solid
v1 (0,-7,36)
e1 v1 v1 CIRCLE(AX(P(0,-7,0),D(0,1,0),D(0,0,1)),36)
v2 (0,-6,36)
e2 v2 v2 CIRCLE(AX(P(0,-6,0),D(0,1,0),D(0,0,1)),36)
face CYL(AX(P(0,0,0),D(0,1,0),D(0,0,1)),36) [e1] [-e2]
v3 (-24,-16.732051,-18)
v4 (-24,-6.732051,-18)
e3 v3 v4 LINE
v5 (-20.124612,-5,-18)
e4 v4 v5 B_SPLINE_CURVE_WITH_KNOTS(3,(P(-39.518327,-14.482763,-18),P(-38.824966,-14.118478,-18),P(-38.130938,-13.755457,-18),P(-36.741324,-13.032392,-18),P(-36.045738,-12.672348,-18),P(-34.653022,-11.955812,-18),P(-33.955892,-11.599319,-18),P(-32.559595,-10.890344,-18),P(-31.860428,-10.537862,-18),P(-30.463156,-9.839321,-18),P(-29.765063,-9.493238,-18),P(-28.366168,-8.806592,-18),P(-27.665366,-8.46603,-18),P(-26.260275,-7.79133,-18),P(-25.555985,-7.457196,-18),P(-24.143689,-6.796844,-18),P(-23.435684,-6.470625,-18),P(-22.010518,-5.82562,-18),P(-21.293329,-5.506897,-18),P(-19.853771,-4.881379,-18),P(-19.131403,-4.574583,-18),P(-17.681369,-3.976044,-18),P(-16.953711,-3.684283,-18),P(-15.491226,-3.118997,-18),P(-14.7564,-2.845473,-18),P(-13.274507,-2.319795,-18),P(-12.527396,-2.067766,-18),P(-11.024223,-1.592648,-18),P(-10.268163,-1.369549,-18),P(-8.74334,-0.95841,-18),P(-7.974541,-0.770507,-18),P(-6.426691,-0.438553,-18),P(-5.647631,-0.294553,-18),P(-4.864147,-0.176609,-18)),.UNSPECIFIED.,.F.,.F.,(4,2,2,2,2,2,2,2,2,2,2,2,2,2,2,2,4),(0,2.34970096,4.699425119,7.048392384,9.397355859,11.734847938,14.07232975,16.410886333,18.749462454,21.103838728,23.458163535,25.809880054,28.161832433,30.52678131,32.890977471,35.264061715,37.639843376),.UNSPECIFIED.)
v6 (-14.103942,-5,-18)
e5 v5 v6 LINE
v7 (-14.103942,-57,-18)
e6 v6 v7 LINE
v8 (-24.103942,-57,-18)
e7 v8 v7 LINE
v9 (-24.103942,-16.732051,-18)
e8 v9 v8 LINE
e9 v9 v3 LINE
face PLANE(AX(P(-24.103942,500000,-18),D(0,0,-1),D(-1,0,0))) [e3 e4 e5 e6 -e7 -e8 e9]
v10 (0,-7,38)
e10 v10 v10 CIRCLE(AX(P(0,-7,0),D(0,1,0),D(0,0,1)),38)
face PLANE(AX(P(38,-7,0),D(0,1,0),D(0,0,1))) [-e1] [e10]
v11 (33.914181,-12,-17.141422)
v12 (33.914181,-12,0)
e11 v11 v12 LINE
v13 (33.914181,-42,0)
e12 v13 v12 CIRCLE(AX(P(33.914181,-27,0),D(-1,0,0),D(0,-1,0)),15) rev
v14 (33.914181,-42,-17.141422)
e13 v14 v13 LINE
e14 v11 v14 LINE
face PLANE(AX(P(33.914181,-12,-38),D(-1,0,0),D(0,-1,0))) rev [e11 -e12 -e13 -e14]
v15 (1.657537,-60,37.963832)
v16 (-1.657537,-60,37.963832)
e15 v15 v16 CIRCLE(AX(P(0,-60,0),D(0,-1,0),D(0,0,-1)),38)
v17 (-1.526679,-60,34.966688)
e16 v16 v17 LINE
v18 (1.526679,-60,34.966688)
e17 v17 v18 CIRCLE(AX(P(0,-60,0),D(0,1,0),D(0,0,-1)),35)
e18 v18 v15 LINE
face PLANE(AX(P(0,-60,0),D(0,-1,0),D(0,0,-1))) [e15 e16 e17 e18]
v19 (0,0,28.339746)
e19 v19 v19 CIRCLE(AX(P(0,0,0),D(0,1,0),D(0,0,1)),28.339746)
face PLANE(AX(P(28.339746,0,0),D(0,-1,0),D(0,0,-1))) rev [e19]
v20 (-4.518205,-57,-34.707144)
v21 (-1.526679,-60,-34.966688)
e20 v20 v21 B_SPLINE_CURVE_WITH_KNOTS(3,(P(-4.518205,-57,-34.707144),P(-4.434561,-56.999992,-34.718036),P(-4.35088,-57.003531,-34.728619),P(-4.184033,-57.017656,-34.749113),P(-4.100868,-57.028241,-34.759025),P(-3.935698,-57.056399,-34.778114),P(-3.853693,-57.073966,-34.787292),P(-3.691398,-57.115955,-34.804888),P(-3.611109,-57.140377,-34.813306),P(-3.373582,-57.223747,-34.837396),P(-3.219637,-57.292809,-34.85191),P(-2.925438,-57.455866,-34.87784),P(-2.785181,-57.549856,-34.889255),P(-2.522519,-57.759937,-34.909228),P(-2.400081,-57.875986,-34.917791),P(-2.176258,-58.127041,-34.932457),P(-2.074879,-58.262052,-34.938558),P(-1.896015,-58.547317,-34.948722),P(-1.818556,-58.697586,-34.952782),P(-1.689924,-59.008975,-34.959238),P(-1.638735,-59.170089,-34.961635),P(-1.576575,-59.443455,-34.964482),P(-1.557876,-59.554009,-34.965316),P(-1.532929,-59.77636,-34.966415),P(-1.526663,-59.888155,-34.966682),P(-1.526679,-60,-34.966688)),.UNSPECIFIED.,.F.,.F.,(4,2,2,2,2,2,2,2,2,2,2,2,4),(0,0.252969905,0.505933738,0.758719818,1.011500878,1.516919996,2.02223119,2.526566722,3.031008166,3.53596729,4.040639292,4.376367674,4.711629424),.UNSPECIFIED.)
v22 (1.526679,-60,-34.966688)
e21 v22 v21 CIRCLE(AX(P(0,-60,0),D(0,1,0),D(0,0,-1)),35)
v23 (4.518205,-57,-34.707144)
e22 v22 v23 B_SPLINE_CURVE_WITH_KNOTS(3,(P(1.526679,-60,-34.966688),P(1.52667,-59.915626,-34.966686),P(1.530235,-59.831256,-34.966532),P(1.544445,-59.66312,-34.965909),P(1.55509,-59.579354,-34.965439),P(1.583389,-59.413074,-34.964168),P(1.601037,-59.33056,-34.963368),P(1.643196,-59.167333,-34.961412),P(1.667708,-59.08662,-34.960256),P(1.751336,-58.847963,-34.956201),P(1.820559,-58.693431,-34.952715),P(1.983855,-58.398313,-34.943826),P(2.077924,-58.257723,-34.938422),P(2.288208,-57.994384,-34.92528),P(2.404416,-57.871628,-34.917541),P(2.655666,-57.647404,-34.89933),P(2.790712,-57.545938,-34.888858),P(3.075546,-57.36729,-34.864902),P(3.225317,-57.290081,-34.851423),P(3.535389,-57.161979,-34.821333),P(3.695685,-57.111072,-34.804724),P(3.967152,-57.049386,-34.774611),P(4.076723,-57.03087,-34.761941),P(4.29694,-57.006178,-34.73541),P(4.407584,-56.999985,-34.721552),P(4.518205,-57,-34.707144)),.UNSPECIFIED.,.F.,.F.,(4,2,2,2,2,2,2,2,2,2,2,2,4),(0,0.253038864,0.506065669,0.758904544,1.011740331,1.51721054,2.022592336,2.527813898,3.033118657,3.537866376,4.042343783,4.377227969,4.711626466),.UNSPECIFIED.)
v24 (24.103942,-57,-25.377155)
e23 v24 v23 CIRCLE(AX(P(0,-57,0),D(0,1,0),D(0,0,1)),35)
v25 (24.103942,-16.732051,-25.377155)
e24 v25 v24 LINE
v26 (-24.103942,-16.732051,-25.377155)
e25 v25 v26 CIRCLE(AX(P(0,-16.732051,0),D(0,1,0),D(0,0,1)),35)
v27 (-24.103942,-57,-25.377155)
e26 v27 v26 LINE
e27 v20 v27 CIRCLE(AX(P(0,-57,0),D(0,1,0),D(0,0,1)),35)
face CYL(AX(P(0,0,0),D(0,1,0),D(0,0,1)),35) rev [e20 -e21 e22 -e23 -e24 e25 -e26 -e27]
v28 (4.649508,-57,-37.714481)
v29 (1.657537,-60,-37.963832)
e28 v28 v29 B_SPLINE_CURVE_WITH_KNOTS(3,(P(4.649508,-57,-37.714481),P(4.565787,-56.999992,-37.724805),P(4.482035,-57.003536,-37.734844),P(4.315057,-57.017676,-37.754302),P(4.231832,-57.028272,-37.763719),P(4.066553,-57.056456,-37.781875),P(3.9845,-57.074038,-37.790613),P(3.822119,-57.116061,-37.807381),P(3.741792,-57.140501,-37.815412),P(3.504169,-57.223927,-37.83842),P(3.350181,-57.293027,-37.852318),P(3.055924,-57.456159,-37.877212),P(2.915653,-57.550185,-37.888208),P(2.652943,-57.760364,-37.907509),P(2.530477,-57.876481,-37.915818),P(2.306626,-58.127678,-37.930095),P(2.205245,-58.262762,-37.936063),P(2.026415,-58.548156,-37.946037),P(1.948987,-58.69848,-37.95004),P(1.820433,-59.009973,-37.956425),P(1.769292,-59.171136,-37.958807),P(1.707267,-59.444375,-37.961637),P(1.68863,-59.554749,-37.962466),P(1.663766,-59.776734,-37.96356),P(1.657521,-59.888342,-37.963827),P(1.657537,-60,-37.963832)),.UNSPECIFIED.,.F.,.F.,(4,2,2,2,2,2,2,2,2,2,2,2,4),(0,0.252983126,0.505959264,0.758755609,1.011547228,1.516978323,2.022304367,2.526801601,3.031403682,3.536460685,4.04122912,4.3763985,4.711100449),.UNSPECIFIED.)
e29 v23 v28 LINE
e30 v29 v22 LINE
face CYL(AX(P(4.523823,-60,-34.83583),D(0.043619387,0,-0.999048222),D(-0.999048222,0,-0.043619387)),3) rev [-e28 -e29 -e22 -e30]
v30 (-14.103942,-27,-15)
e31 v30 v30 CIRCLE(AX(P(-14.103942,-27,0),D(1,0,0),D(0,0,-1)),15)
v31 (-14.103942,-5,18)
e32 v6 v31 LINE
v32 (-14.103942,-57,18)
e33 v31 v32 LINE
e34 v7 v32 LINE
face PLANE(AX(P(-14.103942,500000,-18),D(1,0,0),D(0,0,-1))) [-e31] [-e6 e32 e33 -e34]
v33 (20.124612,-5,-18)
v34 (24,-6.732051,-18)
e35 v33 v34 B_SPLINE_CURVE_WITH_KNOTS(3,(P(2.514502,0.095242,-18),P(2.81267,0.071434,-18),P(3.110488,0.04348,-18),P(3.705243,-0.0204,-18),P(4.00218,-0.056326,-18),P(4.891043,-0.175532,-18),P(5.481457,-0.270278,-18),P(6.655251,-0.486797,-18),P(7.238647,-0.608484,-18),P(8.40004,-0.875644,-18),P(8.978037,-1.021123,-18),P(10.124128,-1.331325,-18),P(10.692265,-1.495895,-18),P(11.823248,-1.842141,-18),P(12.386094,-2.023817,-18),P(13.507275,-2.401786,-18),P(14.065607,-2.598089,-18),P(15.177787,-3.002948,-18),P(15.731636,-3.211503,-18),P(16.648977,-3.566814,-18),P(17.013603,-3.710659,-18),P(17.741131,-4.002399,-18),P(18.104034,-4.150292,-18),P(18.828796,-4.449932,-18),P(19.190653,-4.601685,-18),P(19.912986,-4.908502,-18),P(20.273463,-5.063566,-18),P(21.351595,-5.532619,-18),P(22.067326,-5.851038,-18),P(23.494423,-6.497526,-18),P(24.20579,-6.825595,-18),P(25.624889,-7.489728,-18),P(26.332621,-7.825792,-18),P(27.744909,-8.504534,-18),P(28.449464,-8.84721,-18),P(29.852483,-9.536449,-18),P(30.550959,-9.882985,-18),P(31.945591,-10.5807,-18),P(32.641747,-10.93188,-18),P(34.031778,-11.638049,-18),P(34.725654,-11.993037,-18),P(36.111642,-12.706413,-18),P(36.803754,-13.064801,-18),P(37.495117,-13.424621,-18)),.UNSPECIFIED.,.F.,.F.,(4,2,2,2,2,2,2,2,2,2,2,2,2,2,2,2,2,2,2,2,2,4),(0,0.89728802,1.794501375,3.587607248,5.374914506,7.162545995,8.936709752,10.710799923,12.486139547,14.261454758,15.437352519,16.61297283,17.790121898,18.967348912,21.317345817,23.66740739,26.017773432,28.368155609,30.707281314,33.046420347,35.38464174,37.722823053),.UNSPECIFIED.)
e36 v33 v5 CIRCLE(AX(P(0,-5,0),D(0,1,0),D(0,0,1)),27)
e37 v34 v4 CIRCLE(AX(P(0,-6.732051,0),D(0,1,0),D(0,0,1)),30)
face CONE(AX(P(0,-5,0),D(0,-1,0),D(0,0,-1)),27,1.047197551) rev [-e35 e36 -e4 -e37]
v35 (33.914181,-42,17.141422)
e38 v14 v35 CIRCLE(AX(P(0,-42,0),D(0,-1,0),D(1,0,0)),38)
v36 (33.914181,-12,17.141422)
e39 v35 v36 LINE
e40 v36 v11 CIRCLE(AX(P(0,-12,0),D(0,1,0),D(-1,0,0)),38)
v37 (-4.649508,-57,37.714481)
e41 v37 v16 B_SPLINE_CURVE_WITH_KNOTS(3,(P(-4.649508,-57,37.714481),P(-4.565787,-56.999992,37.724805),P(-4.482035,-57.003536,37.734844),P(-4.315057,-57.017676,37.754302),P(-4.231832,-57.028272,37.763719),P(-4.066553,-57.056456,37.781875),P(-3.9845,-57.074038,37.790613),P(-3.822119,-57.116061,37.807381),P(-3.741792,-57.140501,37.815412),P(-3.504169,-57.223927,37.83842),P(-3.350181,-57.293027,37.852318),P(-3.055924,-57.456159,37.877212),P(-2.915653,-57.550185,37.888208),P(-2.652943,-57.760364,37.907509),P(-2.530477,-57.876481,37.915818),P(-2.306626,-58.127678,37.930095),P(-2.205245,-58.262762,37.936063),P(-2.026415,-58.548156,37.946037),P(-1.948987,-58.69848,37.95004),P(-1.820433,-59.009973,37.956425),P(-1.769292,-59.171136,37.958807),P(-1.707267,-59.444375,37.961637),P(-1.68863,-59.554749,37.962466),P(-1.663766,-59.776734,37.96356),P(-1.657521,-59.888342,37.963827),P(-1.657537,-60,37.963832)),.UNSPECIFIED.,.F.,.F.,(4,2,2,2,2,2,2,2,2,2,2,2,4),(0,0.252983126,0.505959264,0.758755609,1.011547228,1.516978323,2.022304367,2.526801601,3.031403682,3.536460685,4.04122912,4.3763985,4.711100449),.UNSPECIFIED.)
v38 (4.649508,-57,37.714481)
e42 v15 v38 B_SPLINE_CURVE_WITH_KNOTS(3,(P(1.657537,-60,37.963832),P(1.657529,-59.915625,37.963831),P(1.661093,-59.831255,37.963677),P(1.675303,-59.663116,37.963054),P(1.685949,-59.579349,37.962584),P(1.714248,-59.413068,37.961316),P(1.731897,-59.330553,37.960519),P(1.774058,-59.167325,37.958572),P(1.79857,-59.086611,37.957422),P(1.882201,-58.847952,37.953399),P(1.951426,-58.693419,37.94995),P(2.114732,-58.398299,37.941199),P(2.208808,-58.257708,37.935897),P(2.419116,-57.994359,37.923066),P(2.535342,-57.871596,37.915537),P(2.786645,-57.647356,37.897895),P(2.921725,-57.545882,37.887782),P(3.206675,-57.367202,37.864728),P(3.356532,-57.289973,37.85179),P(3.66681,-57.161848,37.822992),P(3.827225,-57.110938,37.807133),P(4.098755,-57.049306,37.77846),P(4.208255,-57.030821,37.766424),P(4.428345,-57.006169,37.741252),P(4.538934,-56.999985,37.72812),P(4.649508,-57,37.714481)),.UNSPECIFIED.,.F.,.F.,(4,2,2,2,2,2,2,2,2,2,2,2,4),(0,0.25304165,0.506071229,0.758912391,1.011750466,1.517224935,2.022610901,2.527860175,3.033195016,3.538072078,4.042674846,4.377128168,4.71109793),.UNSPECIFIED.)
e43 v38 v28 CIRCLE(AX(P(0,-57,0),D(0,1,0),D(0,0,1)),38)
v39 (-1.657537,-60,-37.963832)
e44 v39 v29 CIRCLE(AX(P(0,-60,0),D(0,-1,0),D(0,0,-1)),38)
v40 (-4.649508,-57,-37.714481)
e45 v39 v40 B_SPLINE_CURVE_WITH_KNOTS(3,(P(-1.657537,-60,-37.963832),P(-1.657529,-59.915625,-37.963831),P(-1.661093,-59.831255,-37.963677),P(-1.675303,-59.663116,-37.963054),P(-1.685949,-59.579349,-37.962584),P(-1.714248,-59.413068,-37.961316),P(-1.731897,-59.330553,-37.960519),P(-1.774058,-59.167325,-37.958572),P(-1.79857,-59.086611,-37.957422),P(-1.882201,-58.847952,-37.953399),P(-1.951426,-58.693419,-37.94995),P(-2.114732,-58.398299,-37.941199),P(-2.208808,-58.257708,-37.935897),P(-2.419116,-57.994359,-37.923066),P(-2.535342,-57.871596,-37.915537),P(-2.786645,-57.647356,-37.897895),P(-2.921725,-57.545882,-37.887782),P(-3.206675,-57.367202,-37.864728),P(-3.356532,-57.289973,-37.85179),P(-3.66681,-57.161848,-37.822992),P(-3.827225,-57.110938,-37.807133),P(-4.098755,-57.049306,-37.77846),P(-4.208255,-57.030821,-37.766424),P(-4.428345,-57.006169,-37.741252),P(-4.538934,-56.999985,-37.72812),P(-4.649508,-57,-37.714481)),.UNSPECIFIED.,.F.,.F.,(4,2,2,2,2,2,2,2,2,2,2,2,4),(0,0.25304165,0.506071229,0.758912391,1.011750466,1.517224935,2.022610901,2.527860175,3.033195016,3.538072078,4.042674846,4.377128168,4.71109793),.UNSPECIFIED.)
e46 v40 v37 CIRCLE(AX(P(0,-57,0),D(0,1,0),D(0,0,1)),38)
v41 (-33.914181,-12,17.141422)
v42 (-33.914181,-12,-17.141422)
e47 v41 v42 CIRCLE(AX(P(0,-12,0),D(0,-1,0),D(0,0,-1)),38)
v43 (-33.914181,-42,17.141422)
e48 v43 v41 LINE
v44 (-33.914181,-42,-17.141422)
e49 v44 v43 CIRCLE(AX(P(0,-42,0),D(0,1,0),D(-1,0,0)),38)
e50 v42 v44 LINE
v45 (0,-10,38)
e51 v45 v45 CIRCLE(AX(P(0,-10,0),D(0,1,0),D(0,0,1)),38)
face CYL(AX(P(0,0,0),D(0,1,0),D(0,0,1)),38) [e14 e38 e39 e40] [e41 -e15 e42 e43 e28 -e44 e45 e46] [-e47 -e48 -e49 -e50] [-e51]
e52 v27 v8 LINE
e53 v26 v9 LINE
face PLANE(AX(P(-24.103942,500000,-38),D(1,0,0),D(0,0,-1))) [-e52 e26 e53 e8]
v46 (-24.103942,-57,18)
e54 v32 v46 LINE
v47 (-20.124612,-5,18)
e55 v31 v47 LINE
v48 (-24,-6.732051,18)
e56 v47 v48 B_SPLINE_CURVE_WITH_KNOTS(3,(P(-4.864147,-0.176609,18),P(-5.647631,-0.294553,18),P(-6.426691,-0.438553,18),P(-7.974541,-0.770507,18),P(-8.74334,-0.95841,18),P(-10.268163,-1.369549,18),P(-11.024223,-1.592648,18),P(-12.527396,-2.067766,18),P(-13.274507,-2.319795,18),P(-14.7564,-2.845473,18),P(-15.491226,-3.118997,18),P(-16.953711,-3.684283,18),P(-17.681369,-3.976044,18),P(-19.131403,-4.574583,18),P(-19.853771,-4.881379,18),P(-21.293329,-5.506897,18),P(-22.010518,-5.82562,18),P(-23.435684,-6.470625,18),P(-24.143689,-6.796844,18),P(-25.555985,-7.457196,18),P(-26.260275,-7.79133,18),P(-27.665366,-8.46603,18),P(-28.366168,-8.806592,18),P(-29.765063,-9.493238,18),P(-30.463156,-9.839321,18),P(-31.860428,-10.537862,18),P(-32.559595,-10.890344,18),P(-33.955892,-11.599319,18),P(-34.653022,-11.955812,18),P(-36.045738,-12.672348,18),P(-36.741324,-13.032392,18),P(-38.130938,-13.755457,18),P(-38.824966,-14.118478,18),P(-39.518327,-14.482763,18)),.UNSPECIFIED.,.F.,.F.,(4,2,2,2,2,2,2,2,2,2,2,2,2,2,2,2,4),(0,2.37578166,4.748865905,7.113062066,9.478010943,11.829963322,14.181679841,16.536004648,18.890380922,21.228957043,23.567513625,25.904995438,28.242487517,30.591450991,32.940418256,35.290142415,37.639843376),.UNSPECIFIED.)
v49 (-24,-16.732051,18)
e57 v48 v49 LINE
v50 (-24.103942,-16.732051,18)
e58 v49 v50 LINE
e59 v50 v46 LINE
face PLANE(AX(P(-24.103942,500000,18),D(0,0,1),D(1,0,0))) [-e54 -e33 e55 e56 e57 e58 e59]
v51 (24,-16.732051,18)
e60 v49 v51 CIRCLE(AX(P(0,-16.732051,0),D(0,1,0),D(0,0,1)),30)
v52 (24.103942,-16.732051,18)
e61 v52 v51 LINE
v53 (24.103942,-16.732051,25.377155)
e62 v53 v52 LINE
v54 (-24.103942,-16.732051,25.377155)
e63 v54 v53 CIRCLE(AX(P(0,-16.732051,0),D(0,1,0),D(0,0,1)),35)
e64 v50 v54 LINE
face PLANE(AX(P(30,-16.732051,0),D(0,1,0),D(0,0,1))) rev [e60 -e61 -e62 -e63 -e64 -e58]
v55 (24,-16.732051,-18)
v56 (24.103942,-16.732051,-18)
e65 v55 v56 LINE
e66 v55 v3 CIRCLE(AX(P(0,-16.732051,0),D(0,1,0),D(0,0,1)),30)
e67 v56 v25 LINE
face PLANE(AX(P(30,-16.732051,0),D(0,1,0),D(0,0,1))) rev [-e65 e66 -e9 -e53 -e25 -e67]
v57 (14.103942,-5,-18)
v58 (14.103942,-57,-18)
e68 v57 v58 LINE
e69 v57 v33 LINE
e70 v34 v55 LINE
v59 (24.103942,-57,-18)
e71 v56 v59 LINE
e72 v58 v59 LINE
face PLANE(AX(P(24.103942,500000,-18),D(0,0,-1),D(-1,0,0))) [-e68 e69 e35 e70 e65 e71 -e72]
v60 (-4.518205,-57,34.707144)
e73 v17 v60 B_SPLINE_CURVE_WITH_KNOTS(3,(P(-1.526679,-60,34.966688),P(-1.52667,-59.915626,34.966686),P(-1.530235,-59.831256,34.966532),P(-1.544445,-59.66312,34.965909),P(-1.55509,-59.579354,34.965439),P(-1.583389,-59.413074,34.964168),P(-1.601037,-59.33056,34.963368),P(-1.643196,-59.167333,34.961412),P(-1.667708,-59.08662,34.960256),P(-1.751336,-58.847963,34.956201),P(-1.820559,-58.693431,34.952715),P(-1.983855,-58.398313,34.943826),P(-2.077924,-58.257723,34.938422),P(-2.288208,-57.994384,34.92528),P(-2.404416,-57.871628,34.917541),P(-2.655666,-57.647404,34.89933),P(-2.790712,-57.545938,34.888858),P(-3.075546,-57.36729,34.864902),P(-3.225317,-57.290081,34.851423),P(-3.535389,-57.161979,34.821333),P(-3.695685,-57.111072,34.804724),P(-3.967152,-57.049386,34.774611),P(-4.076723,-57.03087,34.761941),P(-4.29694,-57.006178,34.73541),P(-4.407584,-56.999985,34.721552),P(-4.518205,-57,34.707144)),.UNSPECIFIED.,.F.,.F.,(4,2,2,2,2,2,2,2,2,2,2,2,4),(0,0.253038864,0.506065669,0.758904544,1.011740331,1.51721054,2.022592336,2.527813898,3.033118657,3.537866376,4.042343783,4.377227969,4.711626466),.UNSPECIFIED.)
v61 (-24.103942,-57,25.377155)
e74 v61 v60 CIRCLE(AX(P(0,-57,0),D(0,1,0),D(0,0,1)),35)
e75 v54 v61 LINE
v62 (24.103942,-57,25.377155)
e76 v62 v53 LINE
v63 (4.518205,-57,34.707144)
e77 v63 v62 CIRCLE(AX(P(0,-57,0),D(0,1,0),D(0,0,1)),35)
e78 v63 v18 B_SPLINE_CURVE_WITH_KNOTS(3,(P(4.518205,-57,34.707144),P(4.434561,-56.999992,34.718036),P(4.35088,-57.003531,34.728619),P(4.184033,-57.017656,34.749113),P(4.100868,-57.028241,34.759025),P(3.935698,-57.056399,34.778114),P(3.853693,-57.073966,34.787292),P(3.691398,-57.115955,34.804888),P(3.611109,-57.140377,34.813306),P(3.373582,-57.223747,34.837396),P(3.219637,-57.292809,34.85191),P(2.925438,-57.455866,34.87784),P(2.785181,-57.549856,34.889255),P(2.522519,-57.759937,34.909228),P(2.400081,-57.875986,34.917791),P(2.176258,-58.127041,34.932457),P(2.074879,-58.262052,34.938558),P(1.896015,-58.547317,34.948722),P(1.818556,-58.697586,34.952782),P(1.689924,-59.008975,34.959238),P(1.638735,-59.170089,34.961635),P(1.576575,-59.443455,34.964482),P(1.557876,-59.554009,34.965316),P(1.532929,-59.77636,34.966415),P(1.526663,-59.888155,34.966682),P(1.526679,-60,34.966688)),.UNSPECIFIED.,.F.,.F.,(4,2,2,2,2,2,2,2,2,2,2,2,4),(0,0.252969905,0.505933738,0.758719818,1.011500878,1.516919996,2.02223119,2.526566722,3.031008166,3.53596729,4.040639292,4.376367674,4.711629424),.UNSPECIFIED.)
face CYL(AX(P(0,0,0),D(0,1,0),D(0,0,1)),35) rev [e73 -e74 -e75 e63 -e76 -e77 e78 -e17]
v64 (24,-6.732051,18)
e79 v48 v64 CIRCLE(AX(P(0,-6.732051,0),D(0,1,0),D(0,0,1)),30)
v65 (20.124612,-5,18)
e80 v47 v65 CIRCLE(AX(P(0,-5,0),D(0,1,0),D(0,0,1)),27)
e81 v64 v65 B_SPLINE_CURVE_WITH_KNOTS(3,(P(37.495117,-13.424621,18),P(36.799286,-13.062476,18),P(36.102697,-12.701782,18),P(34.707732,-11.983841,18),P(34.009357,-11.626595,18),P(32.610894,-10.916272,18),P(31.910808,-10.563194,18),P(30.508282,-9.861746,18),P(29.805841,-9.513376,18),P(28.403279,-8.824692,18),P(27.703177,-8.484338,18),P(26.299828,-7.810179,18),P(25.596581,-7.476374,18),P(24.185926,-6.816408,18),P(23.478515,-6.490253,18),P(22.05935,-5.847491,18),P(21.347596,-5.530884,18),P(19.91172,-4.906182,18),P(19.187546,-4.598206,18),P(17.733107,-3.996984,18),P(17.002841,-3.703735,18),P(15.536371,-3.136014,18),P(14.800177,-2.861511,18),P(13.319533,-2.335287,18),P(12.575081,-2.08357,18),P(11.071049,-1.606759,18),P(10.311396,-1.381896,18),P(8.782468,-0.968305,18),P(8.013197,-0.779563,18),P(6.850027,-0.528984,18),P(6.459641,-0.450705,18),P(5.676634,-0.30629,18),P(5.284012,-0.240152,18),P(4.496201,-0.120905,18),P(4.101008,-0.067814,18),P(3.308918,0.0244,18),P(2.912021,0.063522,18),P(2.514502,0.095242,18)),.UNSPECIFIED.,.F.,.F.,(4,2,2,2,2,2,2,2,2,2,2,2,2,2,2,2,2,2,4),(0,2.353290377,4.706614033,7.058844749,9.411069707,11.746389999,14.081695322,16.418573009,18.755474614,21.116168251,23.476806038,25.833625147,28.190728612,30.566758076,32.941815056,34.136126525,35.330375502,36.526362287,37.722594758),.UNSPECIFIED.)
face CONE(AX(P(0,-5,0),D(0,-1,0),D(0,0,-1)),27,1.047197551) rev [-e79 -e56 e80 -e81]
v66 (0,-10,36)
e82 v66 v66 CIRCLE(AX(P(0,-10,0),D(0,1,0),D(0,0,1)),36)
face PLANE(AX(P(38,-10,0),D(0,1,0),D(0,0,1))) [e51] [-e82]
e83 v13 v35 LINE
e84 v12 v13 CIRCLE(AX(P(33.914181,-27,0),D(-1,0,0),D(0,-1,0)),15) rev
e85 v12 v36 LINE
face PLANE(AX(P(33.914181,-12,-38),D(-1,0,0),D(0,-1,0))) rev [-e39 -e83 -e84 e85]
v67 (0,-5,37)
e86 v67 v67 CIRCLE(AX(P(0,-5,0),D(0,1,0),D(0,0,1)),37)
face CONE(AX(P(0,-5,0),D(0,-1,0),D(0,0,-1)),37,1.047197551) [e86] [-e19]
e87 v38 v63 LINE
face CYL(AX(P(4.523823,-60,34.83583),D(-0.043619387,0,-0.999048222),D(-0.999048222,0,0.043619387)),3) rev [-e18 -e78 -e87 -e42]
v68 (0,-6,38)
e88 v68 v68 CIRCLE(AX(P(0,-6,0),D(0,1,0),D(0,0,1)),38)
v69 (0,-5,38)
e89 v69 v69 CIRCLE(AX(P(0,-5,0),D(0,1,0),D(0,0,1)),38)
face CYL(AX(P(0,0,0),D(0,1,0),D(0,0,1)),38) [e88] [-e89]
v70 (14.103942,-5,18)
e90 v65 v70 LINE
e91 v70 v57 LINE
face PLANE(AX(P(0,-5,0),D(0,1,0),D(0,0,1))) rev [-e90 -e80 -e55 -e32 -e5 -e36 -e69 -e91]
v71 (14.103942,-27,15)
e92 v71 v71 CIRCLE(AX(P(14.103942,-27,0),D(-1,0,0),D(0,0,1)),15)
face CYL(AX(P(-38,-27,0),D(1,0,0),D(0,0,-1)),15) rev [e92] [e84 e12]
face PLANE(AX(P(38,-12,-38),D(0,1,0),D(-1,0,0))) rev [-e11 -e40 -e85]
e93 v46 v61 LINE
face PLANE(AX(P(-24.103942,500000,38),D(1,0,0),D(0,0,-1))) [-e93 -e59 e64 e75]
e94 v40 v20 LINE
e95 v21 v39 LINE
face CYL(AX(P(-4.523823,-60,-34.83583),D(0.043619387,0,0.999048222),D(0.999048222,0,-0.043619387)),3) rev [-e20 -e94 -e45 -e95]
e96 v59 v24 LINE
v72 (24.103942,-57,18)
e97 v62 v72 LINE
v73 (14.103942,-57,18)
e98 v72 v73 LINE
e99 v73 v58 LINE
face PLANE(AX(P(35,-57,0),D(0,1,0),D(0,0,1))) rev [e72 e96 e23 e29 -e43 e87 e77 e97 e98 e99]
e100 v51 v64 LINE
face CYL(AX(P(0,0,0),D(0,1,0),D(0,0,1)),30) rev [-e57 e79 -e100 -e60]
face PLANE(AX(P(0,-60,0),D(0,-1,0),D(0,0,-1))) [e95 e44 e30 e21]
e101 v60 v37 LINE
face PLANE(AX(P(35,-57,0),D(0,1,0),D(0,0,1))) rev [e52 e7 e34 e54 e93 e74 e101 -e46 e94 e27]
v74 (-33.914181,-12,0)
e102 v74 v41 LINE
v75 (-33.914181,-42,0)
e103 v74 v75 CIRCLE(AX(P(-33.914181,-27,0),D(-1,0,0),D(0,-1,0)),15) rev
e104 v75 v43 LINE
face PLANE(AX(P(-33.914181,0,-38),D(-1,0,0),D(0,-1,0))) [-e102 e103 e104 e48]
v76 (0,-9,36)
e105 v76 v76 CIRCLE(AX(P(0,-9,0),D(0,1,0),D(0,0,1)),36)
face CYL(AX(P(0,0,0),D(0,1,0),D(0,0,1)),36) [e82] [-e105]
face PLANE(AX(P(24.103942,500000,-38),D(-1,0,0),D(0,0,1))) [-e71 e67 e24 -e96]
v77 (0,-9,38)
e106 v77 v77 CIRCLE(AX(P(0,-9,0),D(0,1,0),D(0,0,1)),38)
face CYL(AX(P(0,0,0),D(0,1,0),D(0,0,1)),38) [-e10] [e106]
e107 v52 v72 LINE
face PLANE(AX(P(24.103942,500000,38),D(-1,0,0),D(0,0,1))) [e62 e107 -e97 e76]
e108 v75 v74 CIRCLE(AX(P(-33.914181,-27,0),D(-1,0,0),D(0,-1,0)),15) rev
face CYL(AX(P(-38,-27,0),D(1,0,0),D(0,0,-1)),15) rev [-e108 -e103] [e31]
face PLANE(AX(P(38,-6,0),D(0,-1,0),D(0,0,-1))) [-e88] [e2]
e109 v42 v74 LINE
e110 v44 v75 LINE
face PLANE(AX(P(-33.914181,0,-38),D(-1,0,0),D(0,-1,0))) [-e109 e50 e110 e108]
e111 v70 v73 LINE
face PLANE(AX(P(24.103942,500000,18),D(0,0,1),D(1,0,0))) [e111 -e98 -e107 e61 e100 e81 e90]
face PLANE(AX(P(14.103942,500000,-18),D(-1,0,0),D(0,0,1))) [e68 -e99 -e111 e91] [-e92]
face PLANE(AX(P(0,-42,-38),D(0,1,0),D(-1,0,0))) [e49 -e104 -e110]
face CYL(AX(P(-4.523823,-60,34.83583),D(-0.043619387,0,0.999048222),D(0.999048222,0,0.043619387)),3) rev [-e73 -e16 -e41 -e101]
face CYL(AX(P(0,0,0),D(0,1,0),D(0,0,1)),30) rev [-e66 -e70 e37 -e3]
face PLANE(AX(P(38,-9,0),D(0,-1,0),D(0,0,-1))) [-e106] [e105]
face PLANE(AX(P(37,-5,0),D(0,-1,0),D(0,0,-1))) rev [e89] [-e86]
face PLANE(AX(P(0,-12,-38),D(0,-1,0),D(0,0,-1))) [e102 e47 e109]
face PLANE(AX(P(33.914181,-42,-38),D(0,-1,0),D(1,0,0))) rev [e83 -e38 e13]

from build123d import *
from build123d.topology import SkipClean

# Parameters (mm, degrees)
BOSS_EXTRUDE1_REACH     = 80.339
CUT_EXTRUDE1_DEPTH      = 87.068697729
CUT_EXTRUDE1_DEPTH_BACK = 87.068697729
GUDGEON_HOLE_R          = 15
CUT_EXTRUDE2_DEPTH      = 103.318131503
RING_CS_W               = 2
RING_CS_H               = 1
BOSS_EXTRUDE2_DEPTH     = 3
FILLET1_R               = 3


with BuildPart() as part:
    # Piston CS → Revolve1 (revolve)
    with BuildSketch(Plane.XY, mode=Mode.PRIVATE) as revolve1_sk:
        Polygon((0, 0), (0, -5), (27, -5), (30, -6.732050808), (30, -16.732050808), (35, -16.732050808), (35, -57), (38, -57), (38, -5), (37, -5), (28.339745962, 0), align=None)
    revolve(revolve1_sk.sketch.rotate(Axis((0, 0, 0), (0, -1, 0)), 90), axis=Axis((0, 0, 0), (0, -1, 0)))

    # Sketch5 → Boss-Extrude1 (add, up to next)
    with BuildSketch(Plane.XZ.offset(57), mode=Mode.PRIVATE) as boss_extrude1_sk1:
        with BuildLine():
            Line((-24.103941586, -38), (-24.103941586, -18))
            Line((-24.103941586, -18), (-14.103941586, -18))
            Line((-14.103941586, -18), (-14.103941586, 18))
            Line((-14.103941586, 18), (-24.103941586, 18))
            Line((-24.103941586, 18), (-24.103941586, 38))
            ThreePointArc((-24.103941586, 38), (-45, 0), (-24.103941586, -38))
        make_face()
    boss_extrude1_tool1 = extrude(boss_extrude1_sk1.sketch, amount=-BOSS_EXTRUDE1_REACH, mode=Mode.PRIVATE) - part.part
    # Sketch5 → Boss-Extrude1 (add, up to next)
    with BuildSketch(Plane.XZ.offset(57), mode=Mode.PRIVATE) as boss_extrude1_sk2:
        with BuildLine():
            Line((24.103941586, 38), (24.103941586, 18))
            Line((24.103941586, 18), (14.103941586, 18))
            Line((14.103941586, 18), (14.103941586, -18))
            Line((14.103941586, -18), (24.103941586, -18))
            Line((24.103941586, -18), (24.103941586, -38))
            ThreePointArc((24.103941586, -38), (45, 0), (24.103941586, 38))
        make_face()
    boss_extrude1_tool2 = extrude(boss_extrude1_sk2.sketch, amount=-BOSS_EXTRUDE1_REACH, mode=Mode.PRIVATE) - part.part
    add(boss_extrude1_tool1.solids().sort_by_distance((-29.359208, -57, 0))[0])
    add(boss_extrude1_tool2.solids().sort_by_distance((29.359208, -57, 0))[0])

    # Gudgeon Hole → Cut-Extrude1 (cut, two sides: drawn at the far end of the back side and taken through both)
    with BuildSketch(Plane(origin=(-14.103941586, 0, 0), x_dir=(0, 0, -1), z_dir=(1, 0, 0)).offset(-CUT_EXTRUDE1_DEPTH_BACK)):
        with Locations((0, -27)):
            Circle(GUDGEON_HOLE_R)
    extrude(amount=CUT_EXTRUDE1_DEPTH + CUT_EXTRUDE1_DEPTH_BACK, mode=Mode.SUBTRACT)

    # Gudgeon Hole Cutouts → Cut-Extrude2 (cut, through all)
    with BuildSketch(Plane.XY.offset(38)):
        with BuildLine():
            Line((33.9141805, -12), (33.9141805, -42))
            Line((33.9141805, -42), (38, -42))
            add(Edge.make_bspline(
                [(38, -42), (32.078947368, -27), (38, -12)],
                knots=[0, 0, 0, 1, 1, 1], degree=2, weights=[0.023, 0.038, 0.053]))
            Line((38, -12), (33.9141805, -12))
        make_face()
        with BuildLine():
            Line((-38, -12), (-33.9141805, -12))
            Line((-33.9141805, -12), (-33.9141805, -42))
            Line((-33.9141805, -42), (-38, -42))
            add(Edge.make_bspline(
                [(-38, -12), (-32.078947368, -27), (-38, -42)],
                knots=[0, 0, 0, 1, 1, 1], degree=2, weights=[0.023, 0.038, 0.053]))
        make_face()
    extrude(amount=-CUT_EXTRUDE2_DEPTH, mode=Mode.SUBTRACT)

    # Ring CS → Cut-Revolve1 (revolve, cut)
    with BuildSketch(Plane.XY, mode=Mode.PRIVATE) as cut_revolve1_sk:
        with Locations((37, -6.5)):
            Rectangle(RING_CS_W, RING_CS_H)
        with Locations((37, -9.5)):
            Rectangle(RING_CS_W, RING_CS_H)
    revolve(cut_revolve1_sk.sketch.rotate(Axis((0, 0, 0), (0, -1, 0)), 90), axis=Axis((0, 0, 0), (0, -1, 0)), mode=Mode.SUBTRACT)

    # Sketch9 → Boss-Extrude2 (add)
    with SkipClean():  # the faces are left unmerged after this step: merging them gives an invalid solid
        with BuildSketch(Plane.XZ.offset(57)):
            with BuildLine():
                Line((-1.526678558, 34.966687755), (-1.65753672, 37.96383242))
                ThreePointArc((-1.65753672, 37.96383242), (0, 38), (1.65753672, 37.96383242))
                Line((1.65753672, 37.96383242), (1.526678558, 34.966687755))
                ThreePointArc((1.526678558, 34.966687755), (0, 35), (-1.526678558, 34.966687755))
            make_face()
            with BuildLine():
                Line((1.526678558, -34.966687755), (1.65753672, -37.96383242))
                ThreePointArc((1.65753672, -37.96383242), (0, -38), (-1.65753672, -37.96383242))
                Line((-1.65753672, -37.96383242), (-1.526678558, -34.966687755))
                ThreePointArc((-1.526678558, -34.966687755), (0, -35), (1.526678558, -34.966687755))
            make_face()
        extrude(amount=BOSS_EXTRUDE2_DEPTH)

    # Fillet1
    # the kernel refuses this fillet: 3 mm, written as the material it adds along each edge
    with BuildSketch(Plane(origin=(1.984682125, -57, 45.456694082), x_dir=(0.9990482215818575, 0, -0.04361938736534301), z_dir=(-0.043619387365343, 0, -0.9990482215818575))) as fillet1_piece_1_section:
        with BuildLine():
            CenterArc((FILLET1_R, FILLET1_R), FILLET1_R, 180, 90)
            Line((0, FILLET1_R), (0, 0))
            Line((0, 0), (FILLET1_R, 0))
        make_face()
    fillet1_piece_1 = extrude(amount=18, mode=Mode.PRIVATE)
    fillet1_piece_1 = fillet1_piece_1 & Plane(origin=(0, -57.679016135, 0), x_dir=(0, 0, 1), z_dir=(0, 1, 0)) * Cylinder(38, 49, mode=Mode.PRIVATE)
    fillet1_piece_1 = fillet1_piece_1 - Plane(origin=(0, -57.679016135, 0), x_dir=(0, 0, 1), z_dir=(0, -1, 0)) * Cylinder(35, 49, mode=Mode.PRIVATE)
    add(fillet1_piece_1)
    with BuildSketch(Plane(origin=(-1.199533153, -57, 27.473826094), x_dir=(-0.999048221581858, 0, -0.04361938736532912), z_dir=(-0.043619387365329124, 0, 0.9990482215818581))) as fillet1_piece_2_section:
        with BuildLine():
            CenterArc((FILLET1_R, FILLET1_R), FILLET1_R, 180, 90)
            Line((0, FILLET1_R), (0, 0))
            Line((0, 0), (FILLET1_R, 0))
        make_face()
    fillet1_piece_2 = extrude(amount=18, mode=Mode.PRIVATE)
    fillet1_piece_2 = fillet1_piece_2 & Plane(origin=(0, -57.679023016, 0), x_dir=(0, 0, 1), z_dir=(0, 1, 0)) * Cylinder(38, 48, mode=Mode.PRIVATE)
    fillet1_piece_2 = fillet1_piece_2 - Plane(origin=(0, -57.679023016, 0), x_dir=(0, 0, 1), z_dir=(0, -1, 0)) * Cylinder(35, 48, mode=Mode.PRIVATE)
    add(fillet1_piece_2)
    with BuildSketch(Plane(origin=(1.199533153, -57, -27.473826094), x_dir=(0.9990482215818575, 0, 0.043619387365343), z_dir=(0.043619387365343, 0, -0.9990482215818575))) as fillet1_piece_3_section:
        with BuildLine():
            CenterArc((FILLET1_R, FILLET1_R), FILLET1_R, 180, 90)
            Line((0, FILLET1_R), (0, 0))
            Line((0, 0), (FILLET1_R, 0))
        make_face()
    fillet1_piece_3 = extrude(amount=18, mode=Mode.PRIVATE)
    fillet1_piece_3 = fillet1_piece_3 & Plane(origin=(0, -57.679021067, 0), x_dir=(0, 0, 1), z_dir=(0, 1, 0)) * Cylinder(38, 49, mode=Mode.PRIVATE)
    fillet1_piece_3 = fillet1_piece_3 - Plane(origin=(0, -57.679021067, 0), x_dir=(0, 0, 1), z_dir=(0, -1, 0)) * Cylinder(35, 49, mode=Mode.PRIVATE)
    add(fillet1_piece_3)
    with BuildSketch(Plane(origin=(-1.984682125, -57, -45.456694082), x_dir=(-0.999048221581858, 0, 0.04361938736532913), z_dir=(0.043619387365329124, 0, 0.9990482215818581))) as fillet1_piece_4_section:
        with BuildLine():
            CenterArc((FILLET1_R, FILLET1_R), FILLET1_R, 180, 90)
            Line((0, FILLET1_R), (0, 0))
            Line((0, 0), (FILLET1_R, 0))
        make_face()
    fillet1_piece_4 = extrude(amount=18, mode=Mode.PRIVATE)
    fillet1_piece_4 = fillet1_piece_4 - Plane(origin=(0, -57.679020805, 0), x_dir=(0, 0, 1), z_dir=(0, -1, 0)) * Cylinder(35, 48, mode=Mode.PRIVATE)
    fillet1_piece_4 = fillet1_piece_4 & Plane(origin=(0, -57.679020805, 0), x_dir=(0, 0, 1), z_dir=(0, 1, 0)) * Cylinder(38, 48, mode=Mode.PRIVATE)
    add(fillet1_piece_4)


solid = part.part
